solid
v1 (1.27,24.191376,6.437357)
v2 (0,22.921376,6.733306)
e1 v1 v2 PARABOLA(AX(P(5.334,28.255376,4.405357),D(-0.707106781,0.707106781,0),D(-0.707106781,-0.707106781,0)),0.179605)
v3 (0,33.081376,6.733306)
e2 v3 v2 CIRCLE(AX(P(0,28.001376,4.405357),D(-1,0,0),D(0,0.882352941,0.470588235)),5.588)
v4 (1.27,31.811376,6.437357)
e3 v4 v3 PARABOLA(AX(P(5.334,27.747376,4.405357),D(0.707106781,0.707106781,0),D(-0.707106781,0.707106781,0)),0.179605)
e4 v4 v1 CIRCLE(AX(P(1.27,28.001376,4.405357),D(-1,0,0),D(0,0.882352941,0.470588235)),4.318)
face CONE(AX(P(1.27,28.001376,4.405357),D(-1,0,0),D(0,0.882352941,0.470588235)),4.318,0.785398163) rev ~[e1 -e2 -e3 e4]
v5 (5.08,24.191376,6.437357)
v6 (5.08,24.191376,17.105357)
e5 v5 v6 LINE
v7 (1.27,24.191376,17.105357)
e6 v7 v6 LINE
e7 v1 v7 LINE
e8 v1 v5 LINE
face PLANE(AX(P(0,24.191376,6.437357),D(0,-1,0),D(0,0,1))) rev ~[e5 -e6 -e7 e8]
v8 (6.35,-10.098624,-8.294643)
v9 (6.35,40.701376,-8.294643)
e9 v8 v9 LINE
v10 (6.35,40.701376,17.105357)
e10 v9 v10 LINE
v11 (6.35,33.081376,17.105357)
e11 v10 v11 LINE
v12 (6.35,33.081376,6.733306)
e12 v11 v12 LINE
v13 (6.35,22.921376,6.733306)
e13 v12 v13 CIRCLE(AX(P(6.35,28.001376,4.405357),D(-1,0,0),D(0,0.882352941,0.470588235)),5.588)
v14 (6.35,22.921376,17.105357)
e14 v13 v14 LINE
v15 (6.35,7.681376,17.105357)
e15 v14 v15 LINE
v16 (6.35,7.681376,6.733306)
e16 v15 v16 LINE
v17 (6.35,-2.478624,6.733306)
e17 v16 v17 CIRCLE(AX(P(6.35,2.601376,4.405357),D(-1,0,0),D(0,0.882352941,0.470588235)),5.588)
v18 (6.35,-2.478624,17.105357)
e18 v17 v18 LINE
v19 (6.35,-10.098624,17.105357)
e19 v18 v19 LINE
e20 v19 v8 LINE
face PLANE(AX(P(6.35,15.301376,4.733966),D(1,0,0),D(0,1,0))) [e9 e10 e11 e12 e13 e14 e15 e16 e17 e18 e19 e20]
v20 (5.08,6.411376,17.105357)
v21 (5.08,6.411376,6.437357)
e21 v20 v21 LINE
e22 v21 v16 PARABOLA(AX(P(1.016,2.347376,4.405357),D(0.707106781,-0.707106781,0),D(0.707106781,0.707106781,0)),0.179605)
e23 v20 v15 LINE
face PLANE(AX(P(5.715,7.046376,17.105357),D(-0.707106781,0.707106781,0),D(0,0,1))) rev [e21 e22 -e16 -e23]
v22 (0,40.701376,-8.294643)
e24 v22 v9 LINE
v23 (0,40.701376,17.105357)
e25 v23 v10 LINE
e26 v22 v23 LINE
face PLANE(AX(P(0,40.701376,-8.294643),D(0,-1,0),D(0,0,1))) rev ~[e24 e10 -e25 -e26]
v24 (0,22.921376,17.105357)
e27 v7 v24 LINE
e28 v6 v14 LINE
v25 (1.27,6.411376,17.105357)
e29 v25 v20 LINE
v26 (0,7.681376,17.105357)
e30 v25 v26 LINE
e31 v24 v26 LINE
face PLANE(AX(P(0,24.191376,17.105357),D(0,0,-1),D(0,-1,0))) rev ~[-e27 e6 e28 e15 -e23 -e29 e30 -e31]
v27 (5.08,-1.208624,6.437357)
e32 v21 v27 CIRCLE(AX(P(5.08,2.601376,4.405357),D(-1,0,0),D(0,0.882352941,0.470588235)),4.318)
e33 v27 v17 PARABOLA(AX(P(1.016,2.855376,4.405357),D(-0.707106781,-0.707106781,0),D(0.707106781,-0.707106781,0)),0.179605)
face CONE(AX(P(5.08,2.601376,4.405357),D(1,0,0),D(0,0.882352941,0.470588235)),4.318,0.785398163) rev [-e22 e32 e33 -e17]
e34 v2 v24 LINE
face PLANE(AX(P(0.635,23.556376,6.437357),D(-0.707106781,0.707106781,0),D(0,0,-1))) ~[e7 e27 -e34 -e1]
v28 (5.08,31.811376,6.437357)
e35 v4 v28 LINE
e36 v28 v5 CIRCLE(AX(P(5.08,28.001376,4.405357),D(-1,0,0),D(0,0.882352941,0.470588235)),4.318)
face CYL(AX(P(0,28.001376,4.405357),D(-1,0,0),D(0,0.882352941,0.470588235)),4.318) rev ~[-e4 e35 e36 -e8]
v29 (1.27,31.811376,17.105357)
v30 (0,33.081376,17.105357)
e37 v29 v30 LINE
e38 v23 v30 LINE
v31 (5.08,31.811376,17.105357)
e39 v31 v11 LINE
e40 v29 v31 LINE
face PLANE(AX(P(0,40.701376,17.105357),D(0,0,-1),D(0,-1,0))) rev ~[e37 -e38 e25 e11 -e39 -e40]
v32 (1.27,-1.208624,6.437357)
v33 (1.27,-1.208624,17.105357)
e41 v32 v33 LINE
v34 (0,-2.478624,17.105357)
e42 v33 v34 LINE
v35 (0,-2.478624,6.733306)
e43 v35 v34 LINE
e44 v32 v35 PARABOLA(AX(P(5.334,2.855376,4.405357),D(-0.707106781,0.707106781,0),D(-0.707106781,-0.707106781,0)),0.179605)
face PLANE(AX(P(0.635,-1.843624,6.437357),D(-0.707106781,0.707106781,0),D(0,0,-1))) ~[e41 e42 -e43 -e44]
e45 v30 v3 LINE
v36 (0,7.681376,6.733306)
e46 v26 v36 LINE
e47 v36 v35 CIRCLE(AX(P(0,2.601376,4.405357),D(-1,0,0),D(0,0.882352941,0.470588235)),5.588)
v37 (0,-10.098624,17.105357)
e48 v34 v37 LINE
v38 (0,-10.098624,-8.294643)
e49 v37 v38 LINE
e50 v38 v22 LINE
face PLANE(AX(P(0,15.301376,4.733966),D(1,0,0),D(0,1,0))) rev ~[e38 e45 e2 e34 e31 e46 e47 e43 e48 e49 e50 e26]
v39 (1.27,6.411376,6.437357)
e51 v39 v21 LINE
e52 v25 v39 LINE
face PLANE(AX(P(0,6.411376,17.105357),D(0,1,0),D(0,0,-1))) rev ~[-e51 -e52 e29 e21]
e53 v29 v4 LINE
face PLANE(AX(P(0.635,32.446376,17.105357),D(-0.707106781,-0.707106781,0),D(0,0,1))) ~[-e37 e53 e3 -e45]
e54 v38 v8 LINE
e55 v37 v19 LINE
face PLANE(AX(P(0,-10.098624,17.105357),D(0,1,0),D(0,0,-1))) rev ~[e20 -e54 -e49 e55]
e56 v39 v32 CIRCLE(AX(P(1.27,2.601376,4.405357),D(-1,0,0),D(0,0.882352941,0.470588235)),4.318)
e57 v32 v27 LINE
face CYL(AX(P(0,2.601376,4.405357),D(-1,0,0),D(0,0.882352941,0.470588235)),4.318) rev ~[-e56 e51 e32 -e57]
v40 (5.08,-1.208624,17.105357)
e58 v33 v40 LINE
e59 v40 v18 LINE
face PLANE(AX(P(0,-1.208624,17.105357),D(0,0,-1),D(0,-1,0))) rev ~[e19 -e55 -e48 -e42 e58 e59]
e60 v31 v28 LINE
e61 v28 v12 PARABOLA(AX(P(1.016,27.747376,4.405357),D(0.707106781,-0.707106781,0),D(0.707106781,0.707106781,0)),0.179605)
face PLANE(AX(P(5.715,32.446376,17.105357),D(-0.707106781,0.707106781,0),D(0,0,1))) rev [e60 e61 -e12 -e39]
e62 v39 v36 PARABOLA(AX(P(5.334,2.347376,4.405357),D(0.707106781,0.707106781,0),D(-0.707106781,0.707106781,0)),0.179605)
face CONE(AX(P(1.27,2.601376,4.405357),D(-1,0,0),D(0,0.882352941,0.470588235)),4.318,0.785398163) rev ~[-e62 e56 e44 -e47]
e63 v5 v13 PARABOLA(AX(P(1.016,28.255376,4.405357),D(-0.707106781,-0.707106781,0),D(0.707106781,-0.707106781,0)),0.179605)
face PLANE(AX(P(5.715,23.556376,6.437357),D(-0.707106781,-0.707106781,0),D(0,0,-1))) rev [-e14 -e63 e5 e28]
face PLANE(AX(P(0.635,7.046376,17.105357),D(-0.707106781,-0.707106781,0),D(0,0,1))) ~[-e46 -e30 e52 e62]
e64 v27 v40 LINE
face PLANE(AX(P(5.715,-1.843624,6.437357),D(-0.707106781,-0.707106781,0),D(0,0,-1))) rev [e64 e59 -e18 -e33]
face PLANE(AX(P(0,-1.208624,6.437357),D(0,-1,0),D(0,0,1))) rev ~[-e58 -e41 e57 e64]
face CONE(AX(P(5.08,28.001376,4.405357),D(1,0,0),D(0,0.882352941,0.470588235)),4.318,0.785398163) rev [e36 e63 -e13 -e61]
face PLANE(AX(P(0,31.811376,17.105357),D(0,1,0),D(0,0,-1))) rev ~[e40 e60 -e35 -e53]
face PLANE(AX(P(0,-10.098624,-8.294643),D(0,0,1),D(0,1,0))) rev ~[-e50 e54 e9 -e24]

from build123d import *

# Parameters (mm, degrees)
F1_DEPTH = 6.35
F2_SIZE  = 1.27


# Not quite as in the source:
# - a feature names something its author has since deleted; it is built from what else it names


with BuildPart() as f1:
    # F0 (on Right) → F1 (new body)
    with BuildSketch(Plane.YZ):
        with BuildLine():
            Line((-10.0986241174, -8.2946426358), (40.7013758826, -8.2946426358))
            Line((40.7013758826, -8.2946426358), (40.7013758826, 17.1053573642))
            Line((40.7013758826, 17.1053573642), (31.8113758826, 17.1053573642))
            Line((31.8113758826, 17.1053573642), (31.8113758826, 6.4373573642))
            ThreePointArc((31.8113758826, 6.4373573642), (28.0013758826, 0.0873573642), (24.1913758826, 6.4373573642))
            Line((24.1913758826, 6.4373573642), (24.1913758826, 17.1053573642))
            Line((24.1913758826, 17.1053573642), (15.3013758826, 17.1053573642))
            Line((15.3013758826, 17.1053573642), (6.4113758826, 17.1053573642))
            Line((6.4113758826, 17.1053573642), (6.4113758826, 6.4373573642))
            ThreePointArc((6.4113758826, 6.4373573642), (2.6013758826, 0.0873573642), (-1.2086241174, 6.4373573642))
            Line((-1.2086241174, 6.4373573642), (-1.2086241174, 17.1053573642))
            Line((-1.2086241174, 17.1053573642), (-10.0986241174, 17.1053573642))
            Line((-10.0986241174, 17.1053573642), (-10.0986241174, -8.2946426358))
        make_face()
    extrude(amount=F1_DEPTH)

    # F2
    f2_edges = [f1.edges().sort_by_distance(p)[0] for p in [
        (6.35, -1.208624, 11.771357),
        (6.35, 2.601376, 0.087357),
        (6.35, 6.411376, 11.771357),
        (6.35, 24.191376, 11.771357),
        (6.35, 28.001376, 0.087357),
        (6.35, 31.811376, 11.771357),
        (0, 2.601376, 0.087357),
        (0, -1.208624, 11.771357),
        (0, 24.191376, 11.771357),
        (0, 28.001376, 0.087357),
        (0, 31.811376, 11.771357),
        (0, 6.411376, 11.771357),
    ]]
    chamfer(f2_edges, length=F2_SIZE)


solid = f1.part
